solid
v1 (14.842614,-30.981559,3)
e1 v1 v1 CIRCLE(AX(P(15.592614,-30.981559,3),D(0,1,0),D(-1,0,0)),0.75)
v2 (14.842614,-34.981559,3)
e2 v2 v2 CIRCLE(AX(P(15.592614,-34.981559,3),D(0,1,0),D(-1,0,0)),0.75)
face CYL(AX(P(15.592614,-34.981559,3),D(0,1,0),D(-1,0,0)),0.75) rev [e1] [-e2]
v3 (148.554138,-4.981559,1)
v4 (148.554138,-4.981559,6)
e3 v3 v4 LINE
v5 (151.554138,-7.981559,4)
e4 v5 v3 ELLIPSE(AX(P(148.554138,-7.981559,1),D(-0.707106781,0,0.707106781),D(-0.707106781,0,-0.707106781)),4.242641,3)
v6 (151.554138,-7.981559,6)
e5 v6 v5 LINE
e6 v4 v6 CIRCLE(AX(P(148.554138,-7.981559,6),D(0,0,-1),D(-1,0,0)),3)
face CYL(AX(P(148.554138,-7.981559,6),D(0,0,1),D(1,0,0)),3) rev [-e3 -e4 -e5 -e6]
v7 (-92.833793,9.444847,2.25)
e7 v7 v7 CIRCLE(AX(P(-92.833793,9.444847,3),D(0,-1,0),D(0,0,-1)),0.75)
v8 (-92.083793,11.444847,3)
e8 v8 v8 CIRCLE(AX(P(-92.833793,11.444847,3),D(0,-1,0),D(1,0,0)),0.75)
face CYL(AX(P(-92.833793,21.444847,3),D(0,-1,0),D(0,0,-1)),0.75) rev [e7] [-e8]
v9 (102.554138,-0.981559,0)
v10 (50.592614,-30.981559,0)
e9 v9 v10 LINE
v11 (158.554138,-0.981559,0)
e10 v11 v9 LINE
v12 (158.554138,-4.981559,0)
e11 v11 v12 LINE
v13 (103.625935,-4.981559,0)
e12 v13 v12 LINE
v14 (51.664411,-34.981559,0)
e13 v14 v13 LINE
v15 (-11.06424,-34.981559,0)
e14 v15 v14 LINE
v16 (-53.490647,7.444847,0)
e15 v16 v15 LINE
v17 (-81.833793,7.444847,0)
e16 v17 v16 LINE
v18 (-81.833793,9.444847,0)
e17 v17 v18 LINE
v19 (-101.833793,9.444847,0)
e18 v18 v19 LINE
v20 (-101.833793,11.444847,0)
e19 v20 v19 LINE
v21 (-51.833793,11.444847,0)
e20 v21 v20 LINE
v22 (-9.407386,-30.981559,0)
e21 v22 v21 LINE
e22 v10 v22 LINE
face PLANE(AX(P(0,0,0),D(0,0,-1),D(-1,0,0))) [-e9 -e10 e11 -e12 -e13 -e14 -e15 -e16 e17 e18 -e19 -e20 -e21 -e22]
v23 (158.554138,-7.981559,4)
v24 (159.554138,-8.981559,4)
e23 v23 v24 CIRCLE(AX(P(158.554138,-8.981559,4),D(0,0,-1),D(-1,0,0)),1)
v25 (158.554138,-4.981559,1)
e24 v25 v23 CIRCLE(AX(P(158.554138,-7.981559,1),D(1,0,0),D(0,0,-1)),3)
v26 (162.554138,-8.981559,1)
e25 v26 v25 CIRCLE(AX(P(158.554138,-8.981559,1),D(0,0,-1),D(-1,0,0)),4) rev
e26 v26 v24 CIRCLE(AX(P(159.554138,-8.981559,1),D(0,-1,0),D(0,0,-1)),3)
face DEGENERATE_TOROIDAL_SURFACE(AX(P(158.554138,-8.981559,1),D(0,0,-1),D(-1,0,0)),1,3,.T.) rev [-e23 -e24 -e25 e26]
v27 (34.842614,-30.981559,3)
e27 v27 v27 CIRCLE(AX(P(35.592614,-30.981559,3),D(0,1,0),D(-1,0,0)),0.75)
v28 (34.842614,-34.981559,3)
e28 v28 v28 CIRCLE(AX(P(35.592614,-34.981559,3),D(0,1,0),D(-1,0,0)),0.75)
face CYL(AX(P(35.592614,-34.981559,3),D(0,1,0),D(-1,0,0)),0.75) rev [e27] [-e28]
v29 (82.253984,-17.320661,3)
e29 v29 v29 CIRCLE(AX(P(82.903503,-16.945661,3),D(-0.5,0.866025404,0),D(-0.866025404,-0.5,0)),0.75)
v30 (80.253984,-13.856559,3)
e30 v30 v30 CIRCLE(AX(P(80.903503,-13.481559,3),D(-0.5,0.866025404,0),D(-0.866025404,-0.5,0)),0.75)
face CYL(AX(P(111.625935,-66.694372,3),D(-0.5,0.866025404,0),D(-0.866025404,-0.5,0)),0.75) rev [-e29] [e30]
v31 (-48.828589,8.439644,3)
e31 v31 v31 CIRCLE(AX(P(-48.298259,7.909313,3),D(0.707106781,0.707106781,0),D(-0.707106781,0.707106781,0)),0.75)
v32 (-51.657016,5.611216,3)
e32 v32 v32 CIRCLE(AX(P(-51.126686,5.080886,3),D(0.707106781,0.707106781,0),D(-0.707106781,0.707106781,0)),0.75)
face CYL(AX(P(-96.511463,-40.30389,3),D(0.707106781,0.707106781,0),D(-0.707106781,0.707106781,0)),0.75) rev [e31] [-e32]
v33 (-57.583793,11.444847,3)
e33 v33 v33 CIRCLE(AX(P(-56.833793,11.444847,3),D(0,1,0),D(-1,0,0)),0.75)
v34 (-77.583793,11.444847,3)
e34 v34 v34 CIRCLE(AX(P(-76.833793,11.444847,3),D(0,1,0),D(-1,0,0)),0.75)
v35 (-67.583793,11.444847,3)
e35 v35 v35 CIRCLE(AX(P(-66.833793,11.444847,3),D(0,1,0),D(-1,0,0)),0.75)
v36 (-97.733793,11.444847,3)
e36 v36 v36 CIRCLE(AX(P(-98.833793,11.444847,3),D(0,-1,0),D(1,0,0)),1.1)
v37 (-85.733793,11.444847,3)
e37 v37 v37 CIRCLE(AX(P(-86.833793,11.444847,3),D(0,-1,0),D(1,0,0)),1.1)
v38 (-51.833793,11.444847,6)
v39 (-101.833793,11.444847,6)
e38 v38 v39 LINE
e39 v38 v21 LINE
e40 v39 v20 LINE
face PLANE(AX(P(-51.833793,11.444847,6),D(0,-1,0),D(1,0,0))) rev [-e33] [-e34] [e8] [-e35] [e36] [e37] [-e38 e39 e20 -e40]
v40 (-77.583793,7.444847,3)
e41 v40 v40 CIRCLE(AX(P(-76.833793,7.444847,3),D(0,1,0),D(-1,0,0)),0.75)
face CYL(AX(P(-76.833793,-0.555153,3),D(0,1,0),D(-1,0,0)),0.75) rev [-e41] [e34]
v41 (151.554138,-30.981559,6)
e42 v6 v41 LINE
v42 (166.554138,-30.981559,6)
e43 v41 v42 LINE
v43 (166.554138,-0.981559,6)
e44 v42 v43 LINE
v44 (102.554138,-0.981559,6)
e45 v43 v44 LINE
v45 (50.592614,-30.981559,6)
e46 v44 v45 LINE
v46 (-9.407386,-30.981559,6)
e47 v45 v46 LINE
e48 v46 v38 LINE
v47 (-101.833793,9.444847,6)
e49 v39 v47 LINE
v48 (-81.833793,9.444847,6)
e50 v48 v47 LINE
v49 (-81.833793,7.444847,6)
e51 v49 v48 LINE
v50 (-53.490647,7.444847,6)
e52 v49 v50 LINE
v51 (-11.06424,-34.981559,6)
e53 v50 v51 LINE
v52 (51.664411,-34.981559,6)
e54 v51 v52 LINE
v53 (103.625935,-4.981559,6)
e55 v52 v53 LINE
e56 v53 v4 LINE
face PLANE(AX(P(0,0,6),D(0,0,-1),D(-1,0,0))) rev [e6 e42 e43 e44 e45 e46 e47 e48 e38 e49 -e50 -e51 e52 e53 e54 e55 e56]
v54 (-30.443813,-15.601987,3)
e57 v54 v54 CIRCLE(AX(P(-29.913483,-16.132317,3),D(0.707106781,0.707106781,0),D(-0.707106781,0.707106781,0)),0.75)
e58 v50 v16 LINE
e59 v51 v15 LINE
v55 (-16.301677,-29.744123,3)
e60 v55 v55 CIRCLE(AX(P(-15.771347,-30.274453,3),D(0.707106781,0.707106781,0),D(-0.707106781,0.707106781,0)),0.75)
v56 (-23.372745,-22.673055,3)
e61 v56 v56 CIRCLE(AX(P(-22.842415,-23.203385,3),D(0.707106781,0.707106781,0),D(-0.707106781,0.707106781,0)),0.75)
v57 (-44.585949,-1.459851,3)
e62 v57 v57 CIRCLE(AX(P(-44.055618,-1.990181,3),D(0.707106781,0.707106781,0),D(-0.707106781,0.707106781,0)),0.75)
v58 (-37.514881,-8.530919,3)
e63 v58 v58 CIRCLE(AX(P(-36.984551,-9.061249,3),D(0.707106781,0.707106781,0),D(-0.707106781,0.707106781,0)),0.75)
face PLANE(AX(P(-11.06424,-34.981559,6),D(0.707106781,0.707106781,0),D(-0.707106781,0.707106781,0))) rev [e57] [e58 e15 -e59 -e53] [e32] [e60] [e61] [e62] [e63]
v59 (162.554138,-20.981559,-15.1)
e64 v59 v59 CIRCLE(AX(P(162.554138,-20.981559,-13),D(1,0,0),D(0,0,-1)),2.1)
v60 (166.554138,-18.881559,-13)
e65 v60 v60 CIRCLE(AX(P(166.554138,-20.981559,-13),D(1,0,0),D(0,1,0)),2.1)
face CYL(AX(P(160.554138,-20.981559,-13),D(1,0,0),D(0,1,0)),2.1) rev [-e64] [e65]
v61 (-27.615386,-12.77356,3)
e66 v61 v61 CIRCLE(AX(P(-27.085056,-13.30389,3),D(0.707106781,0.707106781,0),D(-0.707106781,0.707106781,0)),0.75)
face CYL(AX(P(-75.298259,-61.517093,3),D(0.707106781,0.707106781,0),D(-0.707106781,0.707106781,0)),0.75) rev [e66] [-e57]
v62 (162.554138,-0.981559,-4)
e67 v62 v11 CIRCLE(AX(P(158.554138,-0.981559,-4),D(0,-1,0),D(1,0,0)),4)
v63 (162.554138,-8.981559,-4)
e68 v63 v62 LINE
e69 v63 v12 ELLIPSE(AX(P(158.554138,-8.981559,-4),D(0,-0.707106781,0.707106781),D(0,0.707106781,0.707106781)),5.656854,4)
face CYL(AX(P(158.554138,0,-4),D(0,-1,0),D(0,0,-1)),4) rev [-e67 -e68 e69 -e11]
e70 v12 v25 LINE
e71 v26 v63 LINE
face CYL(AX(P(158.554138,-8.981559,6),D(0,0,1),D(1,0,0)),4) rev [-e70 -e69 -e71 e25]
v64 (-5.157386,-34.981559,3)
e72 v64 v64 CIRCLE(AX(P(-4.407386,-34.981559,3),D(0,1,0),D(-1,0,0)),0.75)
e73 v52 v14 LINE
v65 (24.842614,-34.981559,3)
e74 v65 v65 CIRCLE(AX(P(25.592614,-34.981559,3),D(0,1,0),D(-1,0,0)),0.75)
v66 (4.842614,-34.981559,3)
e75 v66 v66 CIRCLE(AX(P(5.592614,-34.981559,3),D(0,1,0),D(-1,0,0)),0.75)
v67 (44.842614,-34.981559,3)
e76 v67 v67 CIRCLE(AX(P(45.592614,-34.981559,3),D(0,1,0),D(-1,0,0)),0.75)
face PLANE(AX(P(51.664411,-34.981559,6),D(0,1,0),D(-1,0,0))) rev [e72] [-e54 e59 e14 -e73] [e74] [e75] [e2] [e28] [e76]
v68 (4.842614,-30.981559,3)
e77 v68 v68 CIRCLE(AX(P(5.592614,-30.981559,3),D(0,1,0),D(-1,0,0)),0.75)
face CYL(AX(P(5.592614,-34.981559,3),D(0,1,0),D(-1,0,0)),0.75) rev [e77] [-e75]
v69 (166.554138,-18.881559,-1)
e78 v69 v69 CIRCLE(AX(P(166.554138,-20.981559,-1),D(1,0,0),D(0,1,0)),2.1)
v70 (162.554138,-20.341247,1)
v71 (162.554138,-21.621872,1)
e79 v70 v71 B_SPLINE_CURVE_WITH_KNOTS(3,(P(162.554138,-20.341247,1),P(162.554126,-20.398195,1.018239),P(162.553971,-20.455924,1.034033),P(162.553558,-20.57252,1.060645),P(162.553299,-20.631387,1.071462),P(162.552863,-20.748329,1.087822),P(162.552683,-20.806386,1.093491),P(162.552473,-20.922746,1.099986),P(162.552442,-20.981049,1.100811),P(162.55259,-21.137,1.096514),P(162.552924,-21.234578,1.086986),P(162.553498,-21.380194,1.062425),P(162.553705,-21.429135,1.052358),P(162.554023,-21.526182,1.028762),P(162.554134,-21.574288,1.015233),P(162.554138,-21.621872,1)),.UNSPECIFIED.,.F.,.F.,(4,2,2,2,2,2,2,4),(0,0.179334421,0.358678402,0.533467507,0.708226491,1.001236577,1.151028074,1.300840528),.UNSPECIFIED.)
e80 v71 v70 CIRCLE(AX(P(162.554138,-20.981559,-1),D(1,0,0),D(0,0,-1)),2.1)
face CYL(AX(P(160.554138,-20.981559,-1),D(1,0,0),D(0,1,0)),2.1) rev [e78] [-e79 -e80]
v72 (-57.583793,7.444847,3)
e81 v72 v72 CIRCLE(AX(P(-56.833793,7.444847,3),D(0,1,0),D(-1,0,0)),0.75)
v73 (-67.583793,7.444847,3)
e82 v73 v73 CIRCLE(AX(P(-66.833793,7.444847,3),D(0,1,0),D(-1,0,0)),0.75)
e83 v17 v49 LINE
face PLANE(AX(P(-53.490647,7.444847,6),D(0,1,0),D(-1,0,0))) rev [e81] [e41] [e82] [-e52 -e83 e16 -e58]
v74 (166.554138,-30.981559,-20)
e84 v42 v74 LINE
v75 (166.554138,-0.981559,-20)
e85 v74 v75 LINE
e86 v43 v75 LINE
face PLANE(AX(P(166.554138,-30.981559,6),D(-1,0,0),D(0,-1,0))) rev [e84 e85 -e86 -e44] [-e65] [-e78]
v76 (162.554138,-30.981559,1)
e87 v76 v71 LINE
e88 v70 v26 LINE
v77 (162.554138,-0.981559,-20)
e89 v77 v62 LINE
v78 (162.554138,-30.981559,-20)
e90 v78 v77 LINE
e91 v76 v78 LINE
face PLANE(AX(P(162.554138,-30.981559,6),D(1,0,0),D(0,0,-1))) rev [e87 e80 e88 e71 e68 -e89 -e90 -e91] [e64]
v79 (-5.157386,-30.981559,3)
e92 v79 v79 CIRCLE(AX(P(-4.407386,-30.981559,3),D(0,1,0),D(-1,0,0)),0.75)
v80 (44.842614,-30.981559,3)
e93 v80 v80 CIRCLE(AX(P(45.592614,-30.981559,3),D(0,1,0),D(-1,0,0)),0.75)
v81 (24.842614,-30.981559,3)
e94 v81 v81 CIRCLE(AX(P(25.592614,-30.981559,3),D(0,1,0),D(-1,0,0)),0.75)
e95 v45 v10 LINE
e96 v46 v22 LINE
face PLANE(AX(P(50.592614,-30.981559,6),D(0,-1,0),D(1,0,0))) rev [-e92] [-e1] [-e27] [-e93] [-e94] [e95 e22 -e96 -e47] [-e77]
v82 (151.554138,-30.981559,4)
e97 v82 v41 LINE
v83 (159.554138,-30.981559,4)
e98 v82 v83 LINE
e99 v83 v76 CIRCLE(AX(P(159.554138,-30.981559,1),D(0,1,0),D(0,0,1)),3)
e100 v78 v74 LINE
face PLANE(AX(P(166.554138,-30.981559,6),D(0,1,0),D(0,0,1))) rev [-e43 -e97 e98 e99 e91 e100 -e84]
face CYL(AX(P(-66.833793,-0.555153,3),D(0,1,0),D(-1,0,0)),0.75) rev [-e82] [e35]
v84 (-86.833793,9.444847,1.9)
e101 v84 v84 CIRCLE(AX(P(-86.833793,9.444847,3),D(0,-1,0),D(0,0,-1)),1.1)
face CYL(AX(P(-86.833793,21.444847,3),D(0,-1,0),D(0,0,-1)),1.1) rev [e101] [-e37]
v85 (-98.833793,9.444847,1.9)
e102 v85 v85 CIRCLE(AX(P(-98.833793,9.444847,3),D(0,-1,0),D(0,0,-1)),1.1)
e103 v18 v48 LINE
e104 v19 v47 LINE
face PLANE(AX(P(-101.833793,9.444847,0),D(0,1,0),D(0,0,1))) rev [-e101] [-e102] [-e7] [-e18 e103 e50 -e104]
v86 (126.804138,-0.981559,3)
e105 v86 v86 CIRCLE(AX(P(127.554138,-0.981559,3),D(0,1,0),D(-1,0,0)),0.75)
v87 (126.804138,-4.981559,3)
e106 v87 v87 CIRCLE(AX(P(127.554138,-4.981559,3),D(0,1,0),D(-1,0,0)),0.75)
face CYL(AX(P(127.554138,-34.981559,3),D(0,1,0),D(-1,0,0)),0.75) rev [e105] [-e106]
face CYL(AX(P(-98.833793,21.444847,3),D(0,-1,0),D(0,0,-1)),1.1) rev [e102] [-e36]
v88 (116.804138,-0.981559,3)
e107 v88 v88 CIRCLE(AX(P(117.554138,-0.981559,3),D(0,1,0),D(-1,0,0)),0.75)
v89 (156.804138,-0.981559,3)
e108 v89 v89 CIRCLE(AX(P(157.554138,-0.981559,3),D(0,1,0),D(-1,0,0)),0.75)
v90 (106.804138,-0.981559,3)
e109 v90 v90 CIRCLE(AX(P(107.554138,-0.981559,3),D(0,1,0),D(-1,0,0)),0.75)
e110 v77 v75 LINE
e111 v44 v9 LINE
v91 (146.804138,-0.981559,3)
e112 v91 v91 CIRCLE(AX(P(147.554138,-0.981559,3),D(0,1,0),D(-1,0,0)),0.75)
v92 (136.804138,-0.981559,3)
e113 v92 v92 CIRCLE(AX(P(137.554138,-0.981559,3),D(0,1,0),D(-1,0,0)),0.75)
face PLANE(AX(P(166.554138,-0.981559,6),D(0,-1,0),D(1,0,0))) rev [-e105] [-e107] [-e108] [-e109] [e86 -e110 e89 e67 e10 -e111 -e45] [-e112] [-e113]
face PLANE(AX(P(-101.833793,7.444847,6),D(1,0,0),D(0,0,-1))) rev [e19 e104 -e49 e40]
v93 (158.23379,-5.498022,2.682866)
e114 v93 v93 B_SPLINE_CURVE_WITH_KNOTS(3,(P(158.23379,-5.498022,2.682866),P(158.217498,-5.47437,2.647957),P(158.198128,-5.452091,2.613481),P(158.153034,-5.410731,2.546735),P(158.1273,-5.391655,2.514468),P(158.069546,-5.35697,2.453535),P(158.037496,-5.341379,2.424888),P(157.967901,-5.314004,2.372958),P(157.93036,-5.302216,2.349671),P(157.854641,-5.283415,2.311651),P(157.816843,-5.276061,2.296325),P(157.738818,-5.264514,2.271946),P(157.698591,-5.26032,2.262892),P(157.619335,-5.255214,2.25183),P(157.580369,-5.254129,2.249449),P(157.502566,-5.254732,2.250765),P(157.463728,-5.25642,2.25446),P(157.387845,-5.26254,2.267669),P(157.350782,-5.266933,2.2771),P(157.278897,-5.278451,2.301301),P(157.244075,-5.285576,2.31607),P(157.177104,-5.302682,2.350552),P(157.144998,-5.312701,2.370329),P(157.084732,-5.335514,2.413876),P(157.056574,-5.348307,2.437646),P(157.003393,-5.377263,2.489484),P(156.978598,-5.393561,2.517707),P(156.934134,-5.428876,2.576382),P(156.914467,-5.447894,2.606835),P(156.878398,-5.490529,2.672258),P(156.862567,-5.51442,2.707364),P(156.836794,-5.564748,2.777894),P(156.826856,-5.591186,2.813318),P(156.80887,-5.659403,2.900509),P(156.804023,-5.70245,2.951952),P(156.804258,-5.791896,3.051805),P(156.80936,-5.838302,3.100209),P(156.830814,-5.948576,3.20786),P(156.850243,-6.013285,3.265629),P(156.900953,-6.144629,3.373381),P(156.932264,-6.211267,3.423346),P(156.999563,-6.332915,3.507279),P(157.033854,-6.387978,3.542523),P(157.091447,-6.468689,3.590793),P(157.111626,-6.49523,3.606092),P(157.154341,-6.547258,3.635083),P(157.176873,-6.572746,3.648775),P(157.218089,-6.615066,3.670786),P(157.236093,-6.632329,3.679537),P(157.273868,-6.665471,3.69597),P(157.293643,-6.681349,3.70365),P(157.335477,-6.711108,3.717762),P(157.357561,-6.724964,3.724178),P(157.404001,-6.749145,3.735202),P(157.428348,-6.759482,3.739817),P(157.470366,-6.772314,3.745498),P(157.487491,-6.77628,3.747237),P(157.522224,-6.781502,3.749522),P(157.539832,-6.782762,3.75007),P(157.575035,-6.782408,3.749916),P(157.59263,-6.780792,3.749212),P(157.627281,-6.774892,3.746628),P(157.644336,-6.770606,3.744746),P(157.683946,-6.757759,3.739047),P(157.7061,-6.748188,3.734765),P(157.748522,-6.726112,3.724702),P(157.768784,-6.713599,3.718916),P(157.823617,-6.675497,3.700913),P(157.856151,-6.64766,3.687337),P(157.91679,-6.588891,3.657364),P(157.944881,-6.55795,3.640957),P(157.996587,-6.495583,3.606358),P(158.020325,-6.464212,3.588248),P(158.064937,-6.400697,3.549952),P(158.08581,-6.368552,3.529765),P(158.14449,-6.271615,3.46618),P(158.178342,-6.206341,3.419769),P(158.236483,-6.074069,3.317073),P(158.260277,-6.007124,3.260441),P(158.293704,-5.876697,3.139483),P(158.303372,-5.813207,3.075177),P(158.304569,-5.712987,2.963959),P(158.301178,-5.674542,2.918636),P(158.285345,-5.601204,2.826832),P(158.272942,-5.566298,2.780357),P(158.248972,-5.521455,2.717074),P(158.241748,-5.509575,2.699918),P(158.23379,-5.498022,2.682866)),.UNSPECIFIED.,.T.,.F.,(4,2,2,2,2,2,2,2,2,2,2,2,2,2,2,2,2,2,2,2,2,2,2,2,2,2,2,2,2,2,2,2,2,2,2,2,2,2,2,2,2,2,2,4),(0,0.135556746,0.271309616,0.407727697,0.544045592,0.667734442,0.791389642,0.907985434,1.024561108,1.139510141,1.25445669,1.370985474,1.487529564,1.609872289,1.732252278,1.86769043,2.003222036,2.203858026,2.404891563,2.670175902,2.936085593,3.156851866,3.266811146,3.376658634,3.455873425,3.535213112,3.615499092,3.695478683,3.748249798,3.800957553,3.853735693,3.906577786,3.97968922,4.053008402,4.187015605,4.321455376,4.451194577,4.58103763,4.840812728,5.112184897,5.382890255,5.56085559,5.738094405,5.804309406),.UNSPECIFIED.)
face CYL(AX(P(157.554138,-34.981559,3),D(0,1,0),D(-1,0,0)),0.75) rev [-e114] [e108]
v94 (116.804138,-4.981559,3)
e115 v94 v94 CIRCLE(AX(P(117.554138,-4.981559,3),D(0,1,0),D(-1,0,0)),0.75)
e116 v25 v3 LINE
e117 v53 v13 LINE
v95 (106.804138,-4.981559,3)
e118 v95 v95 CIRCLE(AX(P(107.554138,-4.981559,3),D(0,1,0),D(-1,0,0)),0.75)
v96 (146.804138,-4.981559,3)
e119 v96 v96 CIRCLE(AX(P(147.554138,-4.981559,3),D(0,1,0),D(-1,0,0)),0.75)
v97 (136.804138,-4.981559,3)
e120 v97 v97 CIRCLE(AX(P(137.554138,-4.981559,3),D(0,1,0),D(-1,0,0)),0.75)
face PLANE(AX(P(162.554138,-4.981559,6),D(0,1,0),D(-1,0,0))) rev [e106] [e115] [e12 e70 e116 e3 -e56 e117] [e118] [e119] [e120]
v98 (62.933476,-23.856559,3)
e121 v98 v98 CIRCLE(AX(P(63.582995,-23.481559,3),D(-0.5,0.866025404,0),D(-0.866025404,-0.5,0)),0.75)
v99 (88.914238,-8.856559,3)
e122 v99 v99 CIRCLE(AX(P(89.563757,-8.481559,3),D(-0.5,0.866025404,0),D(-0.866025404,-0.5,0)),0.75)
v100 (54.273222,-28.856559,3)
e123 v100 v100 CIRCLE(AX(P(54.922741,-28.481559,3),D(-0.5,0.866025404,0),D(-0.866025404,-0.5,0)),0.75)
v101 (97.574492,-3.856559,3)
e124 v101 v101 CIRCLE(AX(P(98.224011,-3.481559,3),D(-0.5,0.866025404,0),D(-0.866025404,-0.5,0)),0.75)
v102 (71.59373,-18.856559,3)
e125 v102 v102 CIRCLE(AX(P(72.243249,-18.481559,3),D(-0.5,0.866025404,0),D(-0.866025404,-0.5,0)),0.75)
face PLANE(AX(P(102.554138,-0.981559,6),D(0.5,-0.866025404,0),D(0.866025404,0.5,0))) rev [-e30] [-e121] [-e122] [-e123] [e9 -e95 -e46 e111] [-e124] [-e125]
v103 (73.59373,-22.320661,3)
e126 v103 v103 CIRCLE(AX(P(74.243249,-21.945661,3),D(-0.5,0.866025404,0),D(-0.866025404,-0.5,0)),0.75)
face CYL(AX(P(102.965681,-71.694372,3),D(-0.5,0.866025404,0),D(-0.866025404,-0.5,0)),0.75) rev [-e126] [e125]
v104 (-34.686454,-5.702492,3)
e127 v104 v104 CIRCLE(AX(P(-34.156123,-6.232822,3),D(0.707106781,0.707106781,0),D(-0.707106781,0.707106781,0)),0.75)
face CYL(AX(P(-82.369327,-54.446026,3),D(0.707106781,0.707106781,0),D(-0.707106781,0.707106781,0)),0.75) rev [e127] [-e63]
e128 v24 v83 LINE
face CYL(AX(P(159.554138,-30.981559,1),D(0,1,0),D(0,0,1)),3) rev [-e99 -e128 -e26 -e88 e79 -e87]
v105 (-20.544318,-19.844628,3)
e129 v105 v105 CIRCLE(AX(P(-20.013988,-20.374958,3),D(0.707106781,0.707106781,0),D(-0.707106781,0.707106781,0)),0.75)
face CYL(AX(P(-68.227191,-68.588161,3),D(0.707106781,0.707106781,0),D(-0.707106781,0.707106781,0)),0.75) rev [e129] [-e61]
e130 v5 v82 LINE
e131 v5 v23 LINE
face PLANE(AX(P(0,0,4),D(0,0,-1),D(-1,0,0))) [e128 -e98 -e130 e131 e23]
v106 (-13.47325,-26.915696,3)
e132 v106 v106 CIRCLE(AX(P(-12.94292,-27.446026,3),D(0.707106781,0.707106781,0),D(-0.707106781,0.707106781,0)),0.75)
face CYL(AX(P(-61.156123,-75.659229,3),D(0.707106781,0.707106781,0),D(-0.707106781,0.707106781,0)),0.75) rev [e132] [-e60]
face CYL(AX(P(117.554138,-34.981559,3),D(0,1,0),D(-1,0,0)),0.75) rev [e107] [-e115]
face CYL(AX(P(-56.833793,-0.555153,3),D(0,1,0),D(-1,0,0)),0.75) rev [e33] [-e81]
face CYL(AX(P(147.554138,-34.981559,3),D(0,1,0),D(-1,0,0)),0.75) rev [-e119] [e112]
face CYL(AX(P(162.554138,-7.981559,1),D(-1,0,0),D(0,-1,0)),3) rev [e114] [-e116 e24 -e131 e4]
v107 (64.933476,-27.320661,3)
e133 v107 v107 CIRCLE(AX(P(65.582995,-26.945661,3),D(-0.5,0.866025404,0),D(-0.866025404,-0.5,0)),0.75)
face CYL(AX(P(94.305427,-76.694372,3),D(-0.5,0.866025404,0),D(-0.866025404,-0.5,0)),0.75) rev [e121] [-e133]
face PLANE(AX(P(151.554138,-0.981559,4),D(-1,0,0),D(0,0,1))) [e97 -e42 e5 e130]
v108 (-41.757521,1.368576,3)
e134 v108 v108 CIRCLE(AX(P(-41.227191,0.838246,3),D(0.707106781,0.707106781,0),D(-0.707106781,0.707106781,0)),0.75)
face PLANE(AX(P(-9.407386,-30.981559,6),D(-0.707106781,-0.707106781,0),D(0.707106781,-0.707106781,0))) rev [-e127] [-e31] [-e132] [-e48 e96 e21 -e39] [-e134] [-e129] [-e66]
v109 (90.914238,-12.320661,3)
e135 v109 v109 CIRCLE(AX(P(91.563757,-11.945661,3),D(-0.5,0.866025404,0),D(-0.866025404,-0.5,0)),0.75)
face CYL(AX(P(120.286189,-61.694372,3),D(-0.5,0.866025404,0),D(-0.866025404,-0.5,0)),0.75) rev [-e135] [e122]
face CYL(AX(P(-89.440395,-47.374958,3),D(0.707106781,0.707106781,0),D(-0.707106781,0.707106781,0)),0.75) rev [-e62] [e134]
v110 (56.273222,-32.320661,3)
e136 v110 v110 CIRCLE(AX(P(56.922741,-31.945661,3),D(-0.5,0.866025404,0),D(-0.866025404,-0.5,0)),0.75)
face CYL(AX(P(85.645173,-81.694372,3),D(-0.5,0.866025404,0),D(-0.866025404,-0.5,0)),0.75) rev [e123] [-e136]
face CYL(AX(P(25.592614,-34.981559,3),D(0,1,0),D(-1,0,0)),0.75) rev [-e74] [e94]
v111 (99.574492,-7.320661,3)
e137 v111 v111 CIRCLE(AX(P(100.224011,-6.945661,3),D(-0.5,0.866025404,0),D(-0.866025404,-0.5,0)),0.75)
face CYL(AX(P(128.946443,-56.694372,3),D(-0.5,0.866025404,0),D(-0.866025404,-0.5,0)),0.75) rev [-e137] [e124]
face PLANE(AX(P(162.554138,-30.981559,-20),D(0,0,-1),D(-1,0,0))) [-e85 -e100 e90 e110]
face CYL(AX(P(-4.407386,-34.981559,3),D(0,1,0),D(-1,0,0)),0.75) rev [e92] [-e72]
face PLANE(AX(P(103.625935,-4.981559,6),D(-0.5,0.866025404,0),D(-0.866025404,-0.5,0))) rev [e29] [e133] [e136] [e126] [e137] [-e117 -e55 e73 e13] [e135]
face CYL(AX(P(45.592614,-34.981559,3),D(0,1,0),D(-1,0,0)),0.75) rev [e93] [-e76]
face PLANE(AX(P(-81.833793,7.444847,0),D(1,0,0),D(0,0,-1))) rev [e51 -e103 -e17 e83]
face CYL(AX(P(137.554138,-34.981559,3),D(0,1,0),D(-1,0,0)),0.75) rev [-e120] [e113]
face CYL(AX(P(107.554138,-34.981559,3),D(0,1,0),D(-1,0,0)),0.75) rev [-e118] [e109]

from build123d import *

# Parameters (mm, degrees)
BOSS_EXTRUDE1_DEPTH = 6
SKETCH2_W           = 20
SKETCH2_H           = 30
BOSS_EXTRUDE2_DEPTH = 4
SKETCH3_W           = 20
SKETCH3_H           = 2
CUT_EXTRUDE1_DEPTH  = 6
SKETCH4_R           = 0.75
CUT_EXTRUDE2_DEPTH  = 172.161563774
SKETCH5_R           = 0.75
CUT_EXTRUDE3_DEPTH  = 153.773797585
SKETCH6_R           = 0.75
CUT_EXTRUDE4_DEPTH  = 174.032600725
SKETCH7_R           = 0.75
CUT_EXTRUDE5_DEPTH  = 191.462831696
FILLET1_R           = 4
SKETCH8_W           = 15
SKETCH8_H           = 30
BOSS_EXTRUDE3_DEPTH = 2
FILLET2_R           = 3
FILLET3_START       = 4.0000001
FILLET3_DEPTH       = 1.9999999
FILLET3_START_2     = 148.554137986
FILLET3_2_DEPTH     = 3.0000001
FILLET3_START_3     = 0.9999999
FILLET3_3_DEPTH     = 3.00000019
SKETCH9_R           = 0.75
CUT_EXTRUDE6_DEPTH  = 12
SKETCH10_R          = 1.1
CUT_EXTRUDE7_DEPTH  = 12
SKETCH11_R          = 1.1
CUT_EXTRUDE8_DEPTH  = 12
SKETCH12_R          = 0.75
CUT_EXTRUDE9_DEPTH  = 12
SKETCH13_R          = 2.1
CUT_EXTRUDE10_DEPTH = 6
SKETCH14_R          = 2.1
CUT_EXTRUDE11_DEPTH = 6


with BuildPart() as part:
    # Sketch1 → Boss-Extrude1 (new body)
    with BuildSketch(Plane.XY):
        Polygon((166.554138086, -30.981559499), (166.554138086, -0.981559499), (102.554138086, -0.981559499), (50.592613859, -30.981559499), (-9.407386141, -30.981559499), (-51.833793012, 11.444847372), (-101.833793012, 11.444847372), (-101.833793012, 7.444847372), (-53.490647262, 7.444847372), (-11.06424039, -34.981559499), (51.664410629, -34.981559499), (103.625934856, -4.981559499), (162.554138086, -4.981559499), (162.554138086, -30.981559499), align=None)
    extrude(amount=BOSS_EXTRUDE1_DEPTH)

    # Sketch2 → Boss-Extrude2 (add)
    with BuildSketch(Plane(origin=(166.554138086, 0, 0), x_dir=(0, 0, -1), z_dir=(1, 0, 0))):
        with Locations((10, -15.981559499)):
            Rectangle(SKETCH2_W, SKETCH2_H)
    extrude(amount=-BOSS_EXTRUDE2_DEPTH)

    # Sketch3 → Cut-Extrude1 (cut)
    with BuildSketch(Plane.XY.offset(6)):
        with Locations((-91.833793012, 8.444847372)):
            Rectangle(SKETCH3_W, SKETCH3_H)
    extrude(amount=-CUT_EXTRUDE1_DEPTH, mode=Mode.SUBTRACT)

    # Sketch4 → Cut-Extrude2 (cut, through all)
    with BuildSketch(Plane(origin=(0, -0.981559499, 0), x_dir=(1, 0, 0), z_dir=(0, 1, 0))):
        with Locations(Location((107.554138086, -3, 0), (0, 0, 180))):
            Circle(SKETCH4_R)
        with Locations(Location((117.554138086, -3, 0), (0, 0, 180))):
            Circle(SKETCH4_R)
        with Locations(Location((127.554138086, -3, 0), (0, 0, 180))):
            Circle(SKETCH4_R)
        with Locations(Location((137.554138086, -3, 0), (0, 0, 180))):
            Circle(SKETCH4_R)
        with Locations(Location((147.554138086, -3, 0), (0, 0, 180))):
            Circle(SKETCH4_R)
        with Locations(Location((157.554138086, -3, 0), (0, 0, 180))):
            Circle(SKETCH4_R)
    extrude(amount=-CUT_EXTRUDE2_DEPTH, mode=Mode.SUBTRACT)

    # Sketch5 → Cut-Extrude3 (cut, through all)
    with BuildSketch(Plane(origin=(26.063562252, -45.143414047, 0), x_dir=(0.8660254037844379, 0.5000000000000013, 0), z_dir=(-0.5000000000000013, 0.8660254037844379, 0))):
        with Locations(Location((33.323709096, -3, 0), (0, 0, 180))):
            Circle(SKETCH5_R)
        with Locations(Location((43.323709096, -3, 0), (0, 0, 180))):
            Circle(SKETCH5_R)
        with Locations(Location((53.323709096, -3, 0), (0, 0, 180))):
            Circle(SKETCH5_R)
        with Locations(Location((63.323709096, -3, 0), (0, 0, 180))):
            Circle(SKETCH5_R)
        with Locations(Location((73.323709096, -3, 0), (0, 0, 180))):
            Circle(SKETCH5_R)
        with Locations(Location((83.323709096, -3, 0), (0, 0, 180))):
            Circle(SKETCH5_R)
    extrude(amount=-CUT_EXTRUDE3_DEPTH, mode=Mode.SUBTRACT)

    # Sketch6 → Cut-Extrude4 (cut, through all)
    with BuildSketch(Plane(origin=(0, -30.981559499, 0), x_dir=(1, 0, 0), z_dir=(0, 1, 0))):
        with Locations(Location((45.592613859, -3, 0), (0, 0, 180))):
            Circle(SKETCH6_R)
        with Locations(Location((35.592613859, -3, 0), (0, 0, 180))):
            Circle(SKETCH6_R)
        with Locations(Location((25.592613859, -3, 0), (0, 0, 180))):
            Circle(SKETCH6_R)
        with Locations(Location((15.592613859, -3, 0), (0, 0, 180))):
            Circle(SKETCH6_R)
        with Locations(Location((5.592613859, -3, 0), (0, 0, 180))):
            Circle(SKETCH6_R)
        with Locations(Location((-4.407386141, -3, 0), (0, 0, 180))):
            Circle(SKETCH6_R)
    extrude(amount=-CUT_EXTRUDE4_DEPTH, mode=Mode.SUBTRACT)

    # Sketch7 → Cut-Extrude5 (cut, through all)
    with BuildSketch(Plane(origin=(-20.19447282, -20.19447282, 0), x_dir=(0, 0, -1), z_dir=(0.7071067811865487, 0.7071067811865464, 0))):
        with Locations(Location((-3, -10.25524428, 0), (0, 0, 90))):
            Circle(SKETCH7_R)
        with Locations(Location((-3, -0.25524428, 0), (0, 0, 90))):
            Circle(SKETCH7_R)
        with Locations(Location((-3, 9.74475572, 0), (0, 0, 90))):
            Circle(SKETCH7_R)
        with Locations(Location((-3, 19.74475572, 0), (0, 0, 90))):
            Circle(SKETCH7_R)
        with Locations(Location((-3, 29.74475572, 0), (0, 0, 90))):
            Circle(SKETCH7_R)
        with Locations(Location((-3, 39.74475572, 0), (0, 0, 90))):
            Circle(SKETCH7_R)
    extrude(amount=-CUT_EXTRUDE5_DEPTH, mode=Mode.SUBTRACT)

    # Fillet1
    fillet1_edges = [part.edges().sort_by_distance(p)[0] for p in [
        (162.554138086, -4.981559499, 3),
        (162.554138086, -2.981559499, 0),
    ]]
    fillet(fillet1_edges, radius=FILLET1_R)

    # Sketch8 → Boss-Extrude3 (add)
    with BuildSketch(Plane.XY.offset(6)):
        with Locations((159.054138086, -15.981559499)):
            Rectangle(SKETCH8_W, SKETCH8_H)
    extrude(amount=-BOSS_EXTRUDE3_DEPTH)

    # Fillet2
    # the kernel refuses this fillet: 3 mm, written as the material it adds along each edge
    with BuildSketch(Plane(origin=(158.554138086, -8.981559499, 4), x_dir=(1, 0, 0), z_dir=(0, -1, 0))) as fillet2_piece_1:
        with BuildLine():
            CenterArc((4 - FILLET2_R, -FILLET2_R), FILLET2_R, 0, 90)
            Line((4, -FILLET2_R), (4, 0))
            Line((4, 0), (4 - FILLET2_R, 0))
        make_face()
    revolve(axis=Axis((158.554138086, -8.981559499, 4), (0, 0, 1)), revolution_arc=90)
    with BuildSketch(Plane(origin=(151.554138086, -4.981559499, 4), x_dir=(0, -1, 0), z_dir=(1, 0, 0))) as fillet2_piece_2_section:
        with BuildLine():
            CenterArc((FILLET2_R, FILLET2_R), FILLET2_R, 180, 90)
            Line((0, FILLET2_R), (0, 0))
            Line((0, 0), (FILLET2_R, 0))
        make_face()
    fillet2_piece_2 = extrude(amount=7, mode=Mode.PRIVATE)
    fillet2_piece_2 = fillet2_piece_2 - Plane(origin=(157.554138086, -4.981559499, 3), x_dir=(-1, 0, 0), z_dir=(0, 1, 0)) * Cylinder(0.75, 27, mode=Mode.PRIVATE)
    add(fillet2_piece_2)
    with BuildSketch(Plane(origin=(162.554138086, -8.981559499, 4), x_dir=(0, 0, -1), z_dir=(0, -1, 0))) as fillet2_piece_3:
        with BuildLine():
            CenterArc((FILLET2_R, -FILLET2_R), FILLET2_R, 90, 90)
            Line((0, -FILLET2_R), (0, 0))
            Line((0, 0), (FILLET2_R, 0))
        make_face()
    extrude(amount=22)

    # Fillet3: read off the stored shape, not the designer's step
    # Fillet3 outline → Fillet3 (add)
    with BuildSketch(Plane.XY.offset(FILLET3_START)):
        with BuildLine():
            ThreePointArc((148.554138086, -4.981559499), (150.67545843, -5.860239155), (151.554138086, -7.981559499))
            Line((151.554138086, -7.981559499), (151.554138086, -4.981559499))
            Line((151.554138086, -4.981559499), (148.554138086, -4.981559499))
        make_face()
    extrude(amount=FILLET3_DEPTH)

    # Fillet3 2 outline → Fillet3 2 (add)
    with BuildSketch(Plane.YZ.offset(FILLET3_START_2)):
        with BuildLine():
            Line((-4.981559499, 4.0000001), (-7.981559499, 4))
            ThreePointArc((-7.981559499, 4), (-5.860239155, 3.121320344), (-4.981559499, 1))
            Line((-4.981559499, 1), (-4.981559499, 4.0000001))
        make_face()
    extrude(amount=FILLET3_2_DEPTH)

    # Fillet3 3 outline → Fillet3 3 (cut)
    with BuildSketch(Plane.XY.offset(FILLET3_START_3)):
        with BuildLine():
            Line((151.554138085, -9), (151.554138086, -7.981559499))
            ThreePointArc((151.554138086, -7.981559499), (150.67545843, -5.860239155), (148.554138086, -4.981559499))
            Line((148.554138086, -4.981559499), (148.554137986, -9))
            Line((148.554137986, -9), (151.554138085, -9))
        make_face()
    extrude(amount=FILLET3_3_DEPTH, mode=Mode.SUBTRACT)

    # Sketch9 → Cut-Extrude6 (cut)
    with BuildSketch(Plane(origin=(0, 11.444847372, 0), x_dir=(1, 0, 0), z_dir=(0, 1, 0))):
        with Locations(Location((-56.833793012, -3, 0), (0, 0, 180))):
            Circle(SKETCH9_R)
        with Locations(Location((-66.833793012, -3, 0), (0, 0, 180))):
            Circle(SKETCH9_R)
        with Locations(Location((-76.833793012, -3, 0), (0, 0, 180))):
            Circle(SKETCH9_R)
    extrude(amount=-CUT_EXTRUDE6_DEPTH, mode=Mode.SUBTRACT)

    # Sketch10 → Cut-Extrude7 (cut)
    with BuildSketch(Plane.XZ.offset(-9.444847372)):
        with Locations(Location((-98.833793012, 3, 0), (0, 0, 270))):
            Circle(SKETCH10_R)
    extrude(amount=-CUT_EXTRUDE7_DEPTH, mode=Mode.SUBTRACT)

    # Sketch11 → Cut-Extrude8 (cut)
    with BuildSketch(Plane.XZ.offset(-9.444847372)):
        with Locations(Location((-86.833793012, 3, 0), (0, 0, 270))):
            Circle(SKETCH11_R)
    extrude(amount=-CUT_EXTRUDE8_DEPTH, mode=Mode.SUBTRACT)

    # Sketch12 → Cut-Extrude9 (cut)
    with BuildSketch(Plane.XZ.offset(-9.444847372)):
        with Locations(Location((-92.833793012, 3, 0), (0, 0, 270))):
            Circle(SKETCH12_R)
    extrude(amount=-CUT_EXTRUDE9_DEPTH, mode=Mode.SUBTRACT)

    # Sketch13 → Cut-Extrude10 (cut)
    with BuildSketch(Plane(origin=(166.554138086, 0, 0), x_dir=(0, 0, -1), z_dir=(1, 0, 0))):
        with Locations(Location((1, -20.981559499, 0), (0, 0, 90))):
            Circle(SKETCH13_R)
    extrude(amount=-CUT_EXTRUDE10_DEPTH, mode=Mode.SUBTRACT)

    # Sketch14 → Cut-Extrude11 (cut)
    with BuildSketch(Plane(origin=(166.554138086, 0, 0), x_dir=(0, 0, -1), z_dir=(1, 0, 0))):
        with Locations(Location((13, -20.981559499, 0), (0, 0, 90))):
            Circle(SKETCH14_R)
    extrude(amount=-CUT_EXTRUDE11_DEPTH, mode=Mode.SUBTRACT)


solid = part.part
